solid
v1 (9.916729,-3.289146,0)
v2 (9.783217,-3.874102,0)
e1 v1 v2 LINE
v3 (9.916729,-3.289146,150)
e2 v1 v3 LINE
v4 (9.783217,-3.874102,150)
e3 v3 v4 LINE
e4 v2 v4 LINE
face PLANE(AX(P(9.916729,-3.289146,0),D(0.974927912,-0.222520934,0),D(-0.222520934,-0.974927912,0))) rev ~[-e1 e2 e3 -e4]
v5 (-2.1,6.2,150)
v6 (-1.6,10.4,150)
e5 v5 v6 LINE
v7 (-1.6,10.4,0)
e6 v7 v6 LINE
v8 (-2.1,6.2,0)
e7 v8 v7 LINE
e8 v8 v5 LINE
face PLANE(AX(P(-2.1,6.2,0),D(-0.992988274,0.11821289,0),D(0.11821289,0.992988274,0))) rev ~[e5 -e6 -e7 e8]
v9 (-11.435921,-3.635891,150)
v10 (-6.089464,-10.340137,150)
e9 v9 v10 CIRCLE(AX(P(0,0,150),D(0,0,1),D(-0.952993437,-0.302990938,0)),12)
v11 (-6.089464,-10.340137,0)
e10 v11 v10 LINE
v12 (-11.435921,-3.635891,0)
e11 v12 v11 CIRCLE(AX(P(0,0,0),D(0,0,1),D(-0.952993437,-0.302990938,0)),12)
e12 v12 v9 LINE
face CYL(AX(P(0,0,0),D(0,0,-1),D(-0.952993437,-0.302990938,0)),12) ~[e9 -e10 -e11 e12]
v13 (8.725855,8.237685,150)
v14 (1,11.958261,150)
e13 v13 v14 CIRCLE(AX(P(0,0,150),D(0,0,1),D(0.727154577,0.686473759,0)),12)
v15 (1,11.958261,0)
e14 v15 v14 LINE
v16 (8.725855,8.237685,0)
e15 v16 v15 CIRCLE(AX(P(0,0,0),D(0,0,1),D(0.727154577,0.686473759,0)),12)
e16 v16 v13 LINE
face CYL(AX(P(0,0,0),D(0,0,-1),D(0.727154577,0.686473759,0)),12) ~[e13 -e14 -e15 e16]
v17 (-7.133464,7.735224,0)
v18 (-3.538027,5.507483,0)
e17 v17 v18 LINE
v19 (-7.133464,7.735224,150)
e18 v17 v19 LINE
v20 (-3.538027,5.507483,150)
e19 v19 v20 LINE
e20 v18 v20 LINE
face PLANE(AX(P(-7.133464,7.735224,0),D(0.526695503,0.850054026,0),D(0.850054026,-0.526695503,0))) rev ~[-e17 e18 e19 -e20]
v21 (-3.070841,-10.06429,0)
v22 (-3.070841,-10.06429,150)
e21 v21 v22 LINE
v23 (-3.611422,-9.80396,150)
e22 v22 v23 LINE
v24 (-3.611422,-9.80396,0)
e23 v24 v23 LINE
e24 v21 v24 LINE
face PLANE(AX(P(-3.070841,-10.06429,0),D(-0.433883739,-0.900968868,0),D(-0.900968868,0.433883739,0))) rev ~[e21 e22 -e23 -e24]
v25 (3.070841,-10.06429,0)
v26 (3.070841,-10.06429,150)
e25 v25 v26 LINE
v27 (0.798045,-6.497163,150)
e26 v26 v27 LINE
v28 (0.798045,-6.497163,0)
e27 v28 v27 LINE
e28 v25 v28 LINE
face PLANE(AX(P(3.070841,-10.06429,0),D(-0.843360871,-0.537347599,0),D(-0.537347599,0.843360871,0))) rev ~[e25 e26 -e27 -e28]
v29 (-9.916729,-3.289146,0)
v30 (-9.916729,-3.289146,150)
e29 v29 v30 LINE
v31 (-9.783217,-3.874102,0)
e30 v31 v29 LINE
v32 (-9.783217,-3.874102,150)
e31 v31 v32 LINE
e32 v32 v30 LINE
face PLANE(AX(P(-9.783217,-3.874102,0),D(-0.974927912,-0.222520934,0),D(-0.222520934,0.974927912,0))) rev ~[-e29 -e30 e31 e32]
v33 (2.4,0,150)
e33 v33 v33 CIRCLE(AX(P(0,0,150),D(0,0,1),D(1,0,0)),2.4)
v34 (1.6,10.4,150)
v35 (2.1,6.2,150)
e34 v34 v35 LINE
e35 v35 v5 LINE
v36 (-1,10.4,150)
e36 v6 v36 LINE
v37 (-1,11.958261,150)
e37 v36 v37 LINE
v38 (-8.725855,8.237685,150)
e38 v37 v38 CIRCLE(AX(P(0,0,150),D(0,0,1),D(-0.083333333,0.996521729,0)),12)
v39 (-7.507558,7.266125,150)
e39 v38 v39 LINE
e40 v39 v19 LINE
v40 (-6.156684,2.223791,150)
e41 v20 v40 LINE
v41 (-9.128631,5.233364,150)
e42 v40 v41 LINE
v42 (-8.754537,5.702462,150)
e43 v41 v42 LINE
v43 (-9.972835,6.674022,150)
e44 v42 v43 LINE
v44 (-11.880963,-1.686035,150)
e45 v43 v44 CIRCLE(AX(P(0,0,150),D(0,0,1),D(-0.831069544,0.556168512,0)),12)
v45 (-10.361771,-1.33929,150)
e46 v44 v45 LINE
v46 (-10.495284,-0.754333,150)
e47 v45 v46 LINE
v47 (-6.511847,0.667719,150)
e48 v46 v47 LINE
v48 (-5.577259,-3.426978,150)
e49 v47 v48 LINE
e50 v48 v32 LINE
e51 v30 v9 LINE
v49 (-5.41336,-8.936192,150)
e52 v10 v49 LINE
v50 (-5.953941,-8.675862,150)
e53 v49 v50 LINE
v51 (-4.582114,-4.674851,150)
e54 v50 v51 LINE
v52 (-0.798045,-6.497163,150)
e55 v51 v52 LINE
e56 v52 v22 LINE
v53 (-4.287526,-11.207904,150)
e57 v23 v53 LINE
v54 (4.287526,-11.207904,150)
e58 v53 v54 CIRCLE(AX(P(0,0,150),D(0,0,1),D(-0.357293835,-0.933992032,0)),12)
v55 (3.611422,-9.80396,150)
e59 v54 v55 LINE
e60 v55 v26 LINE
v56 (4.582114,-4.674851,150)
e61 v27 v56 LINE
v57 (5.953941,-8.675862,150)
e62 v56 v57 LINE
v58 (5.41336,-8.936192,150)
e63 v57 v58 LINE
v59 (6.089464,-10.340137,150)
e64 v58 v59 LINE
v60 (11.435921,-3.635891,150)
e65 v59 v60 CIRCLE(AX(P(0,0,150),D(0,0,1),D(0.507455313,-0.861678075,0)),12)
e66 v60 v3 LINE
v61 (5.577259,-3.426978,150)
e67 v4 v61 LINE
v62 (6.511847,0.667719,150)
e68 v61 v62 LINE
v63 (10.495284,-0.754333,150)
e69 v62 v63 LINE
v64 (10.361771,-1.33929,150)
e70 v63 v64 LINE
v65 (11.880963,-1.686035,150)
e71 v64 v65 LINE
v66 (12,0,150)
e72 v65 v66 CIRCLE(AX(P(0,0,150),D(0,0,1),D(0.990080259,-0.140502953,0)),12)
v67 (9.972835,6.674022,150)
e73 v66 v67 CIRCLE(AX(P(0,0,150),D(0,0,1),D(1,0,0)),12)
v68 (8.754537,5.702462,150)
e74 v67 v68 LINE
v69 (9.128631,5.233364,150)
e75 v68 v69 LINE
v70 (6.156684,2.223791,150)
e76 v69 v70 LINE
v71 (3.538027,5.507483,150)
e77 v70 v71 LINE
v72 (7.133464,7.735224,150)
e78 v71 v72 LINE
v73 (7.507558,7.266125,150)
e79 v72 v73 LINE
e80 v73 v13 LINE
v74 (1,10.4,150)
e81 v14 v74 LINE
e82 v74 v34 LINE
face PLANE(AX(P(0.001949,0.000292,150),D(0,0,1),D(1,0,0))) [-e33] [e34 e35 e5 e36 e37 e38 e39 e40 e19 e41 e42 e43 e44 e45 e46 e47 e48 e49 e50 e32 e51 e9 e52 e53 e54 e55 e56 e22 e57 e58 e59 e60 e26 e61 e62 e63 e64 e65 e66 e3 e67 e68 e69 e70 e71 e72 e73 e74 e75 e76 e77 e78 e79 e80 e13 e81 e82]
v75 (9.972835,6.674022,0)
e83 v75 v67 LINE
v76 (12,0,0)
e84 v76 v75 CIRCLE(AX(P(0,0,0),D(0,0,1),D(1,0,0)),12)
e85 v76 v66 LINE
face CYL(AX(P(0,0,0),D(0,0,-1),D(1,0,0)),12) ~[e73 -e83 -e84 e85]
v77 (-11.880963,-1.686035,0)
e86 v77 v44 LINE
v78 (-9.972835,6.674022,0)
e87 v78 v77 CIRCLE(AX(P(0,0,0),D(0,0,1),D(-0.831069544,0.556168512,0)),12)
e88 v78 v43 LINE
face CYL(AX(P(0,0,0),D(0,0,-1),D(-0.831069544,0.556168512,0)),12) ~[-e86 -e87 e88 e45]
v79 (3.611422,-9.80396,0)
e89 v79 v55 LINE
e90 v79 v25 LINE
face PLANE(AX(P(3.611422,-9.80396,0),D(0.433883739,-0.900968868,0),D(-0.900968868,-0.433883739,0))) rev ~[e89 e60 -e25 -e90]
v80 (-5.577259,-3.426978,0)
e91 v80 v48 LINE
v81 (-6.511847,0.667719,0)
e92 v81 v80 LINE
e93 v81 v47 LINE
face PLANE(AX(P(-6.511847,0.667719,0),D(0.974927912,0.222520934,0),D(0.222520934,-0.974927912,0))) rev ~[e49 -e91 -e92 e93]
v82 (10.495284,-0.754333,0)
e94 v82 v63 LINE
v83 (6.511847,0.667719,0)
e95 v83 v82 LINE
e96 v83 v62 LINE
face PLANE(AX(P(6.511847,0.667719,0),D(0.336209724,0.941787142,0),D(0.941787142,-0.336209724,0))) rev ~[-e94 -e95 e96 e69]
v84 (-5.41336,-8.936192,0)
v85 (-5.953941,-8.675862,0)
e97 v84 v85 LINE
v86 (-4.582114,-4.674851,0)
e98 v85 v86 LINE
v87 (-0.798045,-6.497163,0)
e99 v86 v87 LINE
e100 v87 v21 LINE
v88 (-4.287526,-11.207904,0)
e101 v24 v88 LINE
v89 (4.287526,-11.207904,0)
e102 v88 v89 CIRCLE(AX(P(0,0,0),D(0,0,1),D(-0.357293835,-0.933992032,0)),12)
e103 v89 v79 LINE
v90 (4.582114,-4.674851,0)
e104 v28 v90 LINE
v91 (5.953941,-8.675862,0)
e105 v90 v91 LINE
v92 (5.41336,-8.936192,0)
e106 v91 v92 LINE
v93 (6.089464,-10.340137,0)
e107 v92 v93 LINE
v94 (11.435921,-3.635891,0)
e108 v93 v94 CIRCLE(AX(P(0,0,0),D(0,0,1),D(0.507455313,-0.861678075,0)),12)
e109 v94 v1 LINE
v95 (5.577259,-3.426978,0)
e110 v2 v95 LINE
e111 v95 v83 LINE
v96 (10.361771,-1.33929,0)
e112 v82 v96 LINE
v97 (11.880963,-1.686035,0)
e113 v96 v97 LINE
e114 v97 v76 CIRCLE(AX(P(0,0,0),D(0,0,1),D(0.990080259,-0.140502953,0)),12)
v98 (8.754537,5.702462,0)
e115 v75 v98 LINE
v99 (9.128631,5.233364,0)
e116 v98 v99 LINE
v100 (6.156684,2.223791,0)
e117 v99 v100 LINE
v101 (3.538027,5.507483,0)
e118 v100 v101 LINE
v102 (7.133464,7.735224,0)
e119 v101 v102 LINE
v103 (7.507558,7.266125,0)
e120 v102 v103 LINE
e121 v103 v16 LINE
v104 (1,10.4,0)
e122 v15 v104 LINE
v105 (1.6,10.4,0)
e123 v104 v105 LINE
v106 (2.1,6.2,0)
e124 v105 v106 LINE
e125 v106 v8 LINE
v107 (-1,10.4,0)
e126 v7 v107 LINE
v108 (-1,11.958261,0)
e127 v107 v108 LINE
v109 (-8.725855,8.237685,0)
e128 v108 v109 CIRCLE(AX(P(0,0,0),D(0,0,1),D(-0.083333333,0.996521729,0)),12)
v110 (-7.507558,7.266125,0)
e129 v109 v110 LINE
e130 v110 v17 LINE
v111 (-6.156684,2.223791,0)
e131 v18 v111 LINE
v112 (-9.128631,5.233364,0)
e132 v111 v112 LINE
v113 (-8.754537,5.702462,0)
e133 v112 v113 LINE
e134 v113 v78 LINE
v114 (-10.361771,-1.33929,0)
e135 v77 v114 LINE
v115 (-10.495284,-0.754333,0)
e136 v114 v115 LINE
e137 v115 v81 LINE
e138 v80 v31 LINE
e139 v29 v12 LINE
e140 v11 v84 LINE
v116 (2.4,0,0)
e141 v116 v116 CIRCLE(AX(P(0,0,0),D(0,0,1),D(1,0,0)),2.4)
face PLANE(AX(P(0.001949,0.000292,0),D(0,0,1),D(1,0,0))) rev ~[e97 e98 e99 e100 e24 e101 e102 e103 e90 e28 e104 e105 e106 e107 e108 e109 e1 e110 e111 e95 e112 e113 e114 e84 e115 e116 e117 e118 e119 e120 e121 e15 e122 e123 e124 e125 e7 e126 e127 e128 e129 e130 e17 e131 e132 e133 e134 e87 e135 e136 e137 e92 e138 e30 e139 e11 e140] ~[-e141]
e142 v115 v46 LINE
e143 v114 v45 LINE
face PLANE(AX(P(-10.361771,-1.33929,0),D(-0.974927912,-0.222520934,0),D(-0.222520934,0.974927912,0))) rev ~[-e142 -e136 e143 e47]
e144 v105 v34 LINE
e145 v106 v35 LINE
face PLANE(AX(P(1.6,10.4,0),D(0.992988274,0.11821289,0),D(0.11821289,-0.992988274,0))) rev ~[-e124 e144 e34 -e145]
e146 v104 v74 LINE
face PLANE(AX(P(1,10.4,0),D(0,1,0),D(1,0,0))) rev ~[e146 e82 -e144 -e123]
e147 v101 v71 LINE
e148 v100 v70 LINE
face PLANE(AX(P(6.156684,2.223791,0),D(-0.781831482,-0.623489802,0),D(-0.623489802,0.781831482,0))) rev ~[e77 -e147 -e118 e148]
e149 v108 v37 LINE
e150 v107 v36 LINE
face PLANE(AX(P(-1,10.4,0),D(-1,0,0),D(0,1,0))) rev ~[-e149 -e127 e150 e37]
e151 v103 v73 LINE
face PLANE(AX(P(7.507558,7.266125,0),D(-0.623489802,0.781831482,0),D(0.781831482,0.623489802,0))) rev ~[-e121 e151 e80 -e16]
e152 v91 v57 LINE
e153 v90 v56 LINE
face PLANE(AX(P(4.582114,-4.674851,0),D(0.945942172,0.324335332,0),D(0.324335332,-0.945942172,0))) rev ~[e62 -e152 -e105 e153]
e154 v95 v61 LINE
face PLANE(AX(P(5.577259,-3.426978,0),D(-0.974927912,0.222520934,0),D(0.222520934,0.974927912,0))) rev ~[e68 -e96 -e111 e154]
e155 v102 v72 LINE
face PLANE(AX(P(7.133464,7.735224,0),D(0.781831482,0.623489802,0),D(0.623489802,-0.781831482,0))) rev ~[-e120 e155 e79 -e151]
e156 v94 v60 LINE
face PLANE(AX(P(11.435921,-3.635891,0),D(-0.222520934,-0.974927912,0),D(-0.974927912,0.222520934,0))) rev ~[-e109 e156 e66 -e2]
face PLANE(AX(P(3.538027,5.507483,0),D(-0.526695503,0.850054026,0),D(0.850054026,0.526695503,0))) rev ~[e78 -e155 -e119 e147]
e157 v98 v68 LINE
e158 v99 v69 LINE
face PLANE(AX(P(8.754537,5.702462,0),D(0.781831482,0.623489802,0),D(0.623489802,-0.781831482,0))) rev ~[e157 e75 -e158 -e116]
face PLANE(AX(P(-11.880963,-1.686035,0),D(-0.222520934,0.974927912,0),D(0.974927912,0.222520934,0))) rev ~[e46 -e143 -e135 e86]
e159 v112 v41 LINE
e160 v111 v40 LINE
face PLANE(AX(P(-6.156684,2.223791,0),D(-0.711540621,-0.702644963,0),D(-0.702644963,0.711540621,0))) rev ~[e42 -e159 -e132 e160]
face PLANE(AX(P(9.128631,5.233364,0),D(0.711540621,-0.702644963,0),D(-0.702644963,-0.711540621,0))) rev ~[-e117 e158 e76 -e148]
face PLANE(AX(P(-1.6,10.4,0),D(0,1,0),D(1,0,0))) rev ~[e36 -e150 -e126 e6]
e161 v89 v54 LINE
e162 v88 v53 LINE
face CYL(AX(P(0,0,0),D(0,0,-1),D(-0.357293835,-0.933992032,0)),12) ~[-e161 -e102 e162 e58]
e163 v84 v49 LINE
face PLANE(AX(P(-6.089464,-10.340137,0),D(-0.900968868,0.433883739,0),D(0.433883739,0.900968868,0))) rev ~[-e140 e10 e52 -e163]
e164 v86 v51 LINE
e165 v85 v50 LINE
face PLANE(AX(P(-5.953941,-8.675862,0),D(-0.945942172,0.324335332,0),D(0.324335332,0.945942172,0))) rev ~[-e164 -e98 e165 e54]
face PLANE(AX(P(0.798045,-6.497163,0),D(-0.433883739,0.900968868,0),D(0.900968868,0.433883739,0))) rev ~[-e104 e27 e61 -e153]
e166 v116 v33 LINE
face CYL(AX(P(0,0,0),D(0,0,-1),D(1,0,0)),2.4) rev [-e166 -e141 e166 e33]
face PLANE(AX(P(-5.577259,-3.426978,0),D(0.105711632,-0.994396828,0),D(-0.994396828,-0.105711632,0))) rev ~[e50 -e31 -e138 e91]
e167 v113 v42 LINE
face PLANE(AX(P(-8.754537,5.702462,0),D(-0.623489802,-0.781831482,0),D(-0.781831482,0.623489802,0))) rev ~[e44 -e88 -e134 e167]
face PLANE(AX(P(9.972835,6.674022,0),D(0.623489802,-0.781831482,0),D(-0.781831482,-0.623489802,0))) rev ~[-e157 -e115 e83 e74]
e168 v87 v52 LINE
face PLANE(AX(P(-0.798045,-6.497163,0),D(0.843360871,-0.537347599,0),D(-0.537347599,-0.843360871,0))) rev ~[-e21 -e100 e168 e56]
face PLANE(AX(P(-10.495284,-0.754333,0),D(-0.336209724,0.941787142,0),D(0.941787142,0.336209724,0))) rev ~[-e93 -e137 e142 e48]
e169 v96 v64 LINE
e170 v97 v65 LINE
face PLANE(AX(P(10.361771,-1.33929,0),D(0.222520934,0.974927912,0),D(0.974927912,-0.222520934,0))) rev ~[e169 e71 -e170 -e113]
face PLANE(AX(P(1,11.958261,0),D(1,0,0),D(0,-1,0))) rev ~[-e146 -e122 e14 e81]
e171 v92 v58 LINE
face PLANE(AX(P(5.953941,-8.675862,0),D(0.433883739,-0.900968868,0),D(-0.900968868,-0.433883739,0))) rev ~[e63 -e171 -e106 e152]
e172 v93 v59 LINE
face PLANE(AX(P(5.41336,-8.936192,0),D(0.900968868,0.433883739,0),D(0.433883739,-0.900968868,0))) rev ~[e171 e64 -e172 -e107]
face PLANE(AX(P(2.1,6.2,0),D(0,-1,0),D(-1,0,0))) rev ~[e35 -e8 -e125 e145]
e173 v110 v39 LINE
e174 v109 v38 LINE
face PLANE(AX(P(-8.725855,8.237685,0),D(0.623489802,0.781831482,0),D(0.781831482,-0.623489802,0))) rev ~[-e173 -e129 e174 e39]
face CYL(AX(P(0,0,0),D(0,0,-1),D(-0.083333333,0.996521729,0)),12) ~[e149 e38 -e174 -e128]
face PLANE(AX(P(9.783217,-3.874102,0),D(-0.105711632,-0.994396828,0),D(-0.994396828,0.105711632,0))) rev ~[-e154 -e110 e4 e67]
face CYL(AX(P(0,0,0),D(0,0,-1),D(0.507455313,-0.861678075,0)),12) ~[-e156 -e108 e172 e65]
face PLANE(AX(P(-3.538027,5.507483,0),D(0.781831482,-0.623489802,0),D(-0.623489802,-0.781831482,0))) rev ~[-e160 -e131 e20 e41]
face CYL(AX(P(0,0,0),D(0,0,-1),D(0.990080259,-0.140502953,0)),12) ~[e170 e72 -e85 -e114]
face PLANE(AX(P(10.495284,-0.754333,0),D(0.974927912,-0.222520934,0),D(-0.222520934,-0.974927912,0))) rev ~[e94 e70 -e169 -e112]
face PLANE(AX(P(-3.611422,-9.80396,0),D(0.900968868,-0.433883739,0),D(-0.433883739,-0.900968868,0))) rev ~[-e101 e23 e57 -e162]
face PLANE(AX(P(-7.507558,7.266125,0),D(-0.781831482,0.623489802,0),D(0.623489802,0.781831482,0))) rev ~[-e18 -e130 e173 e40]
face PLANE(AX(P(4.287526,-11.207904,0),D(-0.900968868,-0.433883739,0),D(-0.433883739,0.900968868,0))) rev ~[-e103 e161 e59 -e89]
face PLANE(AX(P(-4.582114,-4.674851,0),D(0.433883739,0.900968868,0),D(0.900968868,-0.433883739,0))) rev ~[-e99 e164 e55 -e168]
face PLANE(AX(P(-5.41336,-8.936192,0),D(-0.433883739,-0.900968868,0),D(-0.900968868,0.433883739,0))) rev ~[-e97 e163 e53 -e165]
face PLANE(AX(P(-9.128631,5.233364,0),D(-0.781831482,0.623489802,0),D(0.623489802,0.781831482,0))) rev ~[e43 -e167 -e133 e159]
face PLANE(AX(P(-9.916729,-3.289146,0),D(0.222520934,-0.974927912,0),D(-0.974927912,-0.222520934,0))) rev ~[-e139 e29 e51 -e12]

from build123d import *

# Parameters (mm, degrees)
F0_R     = 2.4
F1_DEPTH = 150


# Not quite as in the source:
# - a feature names something its author has since deleted; it is built from what else it names


with BuildPart() as f1:
    # F0 (on Top) → F1 (new body)
    with BuildSketch(Plane.XY):
        with BuildLine():
            ThreePointArc((11.8809631136, -1.6860354369), (11.9702037861, -0.8451161569), (12, 0))
            ThreePointArc((12, 0), (11.4820297491, 3.4875482565), (9.9728345264, 6.6740221388))
            Line((9.9728345264, 6.6740221388), (8.7545372195, 5.7024624569))
            Line((8.7545372195, 5.7024624569), (9.1286311006, 5.2333635674))
            Line((9.1286311006, 5.2333635674), (6.1566837752, 2.2237906583))
            Line((6.1566837752, 2.2237906583), (3.5380266074, 5.5074828847))
            Line((3.5380266074, 5.5074828847), (7.1334637347, 7.7352243113))
            Line((7.1334637347, 7.7352243113), (7.5075576158, 7.2661254218))
            Line((7.5075576158, 7.2661254218), (8.7258549227, 8.2376851038))
            ThreePointArc((8.7258549227, 8.2376851038), (5.2066048694, 10.8116264148), (1, 11.9582607431))
            Line((1, 11.9582607431), (1, 10.4))
            Line((1, 10.4), (1.6, 10.4))
            Line((1.6, 10.4), (2.1, 6.2))
            Line((2.1, 6.2), (-2.1, 6.2))
            Line((-2.1, 6.2), (-1.6, 10.4))
            Line((-1.6, 10.4), (-1, 10.4))
            Line((-1, 10.4), (-1, 11.9582607431))
            ThreePointArc((-1, 11.9582607431), (-5.2066048694, 10.8116264148), (-8.7258549227, 8.2376851038))
            Line((-8.7258549227, 8.2376851038), (-7.5075576158, 7.2661254218))
            Line((-7.5075576158, 7.2661254218), (-7.1334637347, 7.7352243113))
            Line((-7.1334637347, 7.7352243113), (-3.5380266074, 5.5074828847))
            Line((-3.5380266074, 5.5074828847), (-6.1566837752, 2.2237906583))
            Line((-6.1566837752, 2.2237906583), (-9.1286311006, 5.2333635674))
            Line((-9.1286311006, 5.2333635674), (-8.7545372195, 5.7024624569))
            Line((-8.7545372195, 5.7024624569), (-9.9728345264, 6.6740221388))
            ThreePointArc((-9.9728345264, 6.6740221388), (-11.6991349462, 2.6702512075), (-11.8809631136, -1.6860354369))
            Line((-11.8809631136, -1.6860354369), (-10.3617712206, -1.339289801))
            Line((-10.3617712206, -1.339289801), (-10.495283781, -0.7543330537))
            Line((-10.495283781, -0.7543330537), (-6.5118470168, 0.6677188251))
            Line((-6.5118470168, 0.6677188251), (-5.5772590942, -3.4269784061))
            Line((-5.5772590942, -3.4269784061), (-9.7832167924, -3.8741023726))
            Line((-9.7832167924, -3.8741023726), (-9.9167293527, -3.2891456253))
            Line((-9.9167293527, -3.2891456253), (-11.4359212456, -3.6358912612))
            ThreePointArc((-11.4359212456, -3.6358912612), (-9.3819777896, -7.4818776223), (-6.0894637525, -10.3401369047))
            Line((-6.0894637525, -10.3401369047), (-5.4133597547, -8.9361924871))
            Line((-5.4133597547, -8.9361924871), (-5.9539410755, -8.6758622436))
            Line((-5.9539410755, -8.6758622436), (-4.5821138051, -4.6748511288))
            Line((-4.5821138051, -4.6748511288), (-0.7980445599, -6.4971628331))
            Line((-0.7980445599, -6.4971628331), (-3.0708406982, -10.0642902088))
            Line((-3.0708406982, -10.0642902088), (-3.6114220189, -9.8039599653))
            Line((-3.6114220189, -9.8039599653), (-4.2875260167, -11.2079043829))
            ThreePointArc((-4.2875260167, -11.2079043829), (0, -12), (4.2875260167, -11.2079043829))
            Line((4.2875260167, -11.2079043829), (3.6114220189, -9.8039599653))
            Line((3.6114220189, -9.8039599653), (3.0708406982, -10.0642902088))
            Line((3.0708406982, -10.0642902088), (0.7980445599, -6.4971628331))
            Line((0.7980445599, -6.4971628331), (4.5821138051, -4.6748511288))
            Line((4.5821138051, -4.6748511288), (5.9539410755, -8.6758622436))
            Line((5.9539410755, -8.6758622436), (5.4133597547, -8.9361924871))
            Line((5.4133597547, -8.9361924871), (6.0894637525, -10.3401369047))
            ThreePointArc((6.0894637525, -10.3401369047), (9.3819777896, -7.4818776223), (11.4359212456, -3.6358912612))
            Line((11.4359212456, -3.6358912612), (9.9167293527, -3.2891456253))
            Line((9.9167293527, -3.2891456253), (9.7832167924, -3.8741023726))
            Line((9.7832167924, -3.8741023726), (5.5772590942, -3.4269784061))
            Line((5.5772590942, -3.4269784061), (6.5118470168, 0.6677188251))
            Line((6.5118470168, 0.6677188251), (10.495283781, -0.7543330537))
            Line((10.495283781, -0.7543330537), (10.3617712206, -1.339289801))
            Line((10.3617712206, -1.339289801), (11.8809631136, -1.6860354369))
        make_face()
        Circle(F0_R, mode=Mode.SUBTRACT)
    extrude(amount=F1_DEPTH)


solid = f1.part
